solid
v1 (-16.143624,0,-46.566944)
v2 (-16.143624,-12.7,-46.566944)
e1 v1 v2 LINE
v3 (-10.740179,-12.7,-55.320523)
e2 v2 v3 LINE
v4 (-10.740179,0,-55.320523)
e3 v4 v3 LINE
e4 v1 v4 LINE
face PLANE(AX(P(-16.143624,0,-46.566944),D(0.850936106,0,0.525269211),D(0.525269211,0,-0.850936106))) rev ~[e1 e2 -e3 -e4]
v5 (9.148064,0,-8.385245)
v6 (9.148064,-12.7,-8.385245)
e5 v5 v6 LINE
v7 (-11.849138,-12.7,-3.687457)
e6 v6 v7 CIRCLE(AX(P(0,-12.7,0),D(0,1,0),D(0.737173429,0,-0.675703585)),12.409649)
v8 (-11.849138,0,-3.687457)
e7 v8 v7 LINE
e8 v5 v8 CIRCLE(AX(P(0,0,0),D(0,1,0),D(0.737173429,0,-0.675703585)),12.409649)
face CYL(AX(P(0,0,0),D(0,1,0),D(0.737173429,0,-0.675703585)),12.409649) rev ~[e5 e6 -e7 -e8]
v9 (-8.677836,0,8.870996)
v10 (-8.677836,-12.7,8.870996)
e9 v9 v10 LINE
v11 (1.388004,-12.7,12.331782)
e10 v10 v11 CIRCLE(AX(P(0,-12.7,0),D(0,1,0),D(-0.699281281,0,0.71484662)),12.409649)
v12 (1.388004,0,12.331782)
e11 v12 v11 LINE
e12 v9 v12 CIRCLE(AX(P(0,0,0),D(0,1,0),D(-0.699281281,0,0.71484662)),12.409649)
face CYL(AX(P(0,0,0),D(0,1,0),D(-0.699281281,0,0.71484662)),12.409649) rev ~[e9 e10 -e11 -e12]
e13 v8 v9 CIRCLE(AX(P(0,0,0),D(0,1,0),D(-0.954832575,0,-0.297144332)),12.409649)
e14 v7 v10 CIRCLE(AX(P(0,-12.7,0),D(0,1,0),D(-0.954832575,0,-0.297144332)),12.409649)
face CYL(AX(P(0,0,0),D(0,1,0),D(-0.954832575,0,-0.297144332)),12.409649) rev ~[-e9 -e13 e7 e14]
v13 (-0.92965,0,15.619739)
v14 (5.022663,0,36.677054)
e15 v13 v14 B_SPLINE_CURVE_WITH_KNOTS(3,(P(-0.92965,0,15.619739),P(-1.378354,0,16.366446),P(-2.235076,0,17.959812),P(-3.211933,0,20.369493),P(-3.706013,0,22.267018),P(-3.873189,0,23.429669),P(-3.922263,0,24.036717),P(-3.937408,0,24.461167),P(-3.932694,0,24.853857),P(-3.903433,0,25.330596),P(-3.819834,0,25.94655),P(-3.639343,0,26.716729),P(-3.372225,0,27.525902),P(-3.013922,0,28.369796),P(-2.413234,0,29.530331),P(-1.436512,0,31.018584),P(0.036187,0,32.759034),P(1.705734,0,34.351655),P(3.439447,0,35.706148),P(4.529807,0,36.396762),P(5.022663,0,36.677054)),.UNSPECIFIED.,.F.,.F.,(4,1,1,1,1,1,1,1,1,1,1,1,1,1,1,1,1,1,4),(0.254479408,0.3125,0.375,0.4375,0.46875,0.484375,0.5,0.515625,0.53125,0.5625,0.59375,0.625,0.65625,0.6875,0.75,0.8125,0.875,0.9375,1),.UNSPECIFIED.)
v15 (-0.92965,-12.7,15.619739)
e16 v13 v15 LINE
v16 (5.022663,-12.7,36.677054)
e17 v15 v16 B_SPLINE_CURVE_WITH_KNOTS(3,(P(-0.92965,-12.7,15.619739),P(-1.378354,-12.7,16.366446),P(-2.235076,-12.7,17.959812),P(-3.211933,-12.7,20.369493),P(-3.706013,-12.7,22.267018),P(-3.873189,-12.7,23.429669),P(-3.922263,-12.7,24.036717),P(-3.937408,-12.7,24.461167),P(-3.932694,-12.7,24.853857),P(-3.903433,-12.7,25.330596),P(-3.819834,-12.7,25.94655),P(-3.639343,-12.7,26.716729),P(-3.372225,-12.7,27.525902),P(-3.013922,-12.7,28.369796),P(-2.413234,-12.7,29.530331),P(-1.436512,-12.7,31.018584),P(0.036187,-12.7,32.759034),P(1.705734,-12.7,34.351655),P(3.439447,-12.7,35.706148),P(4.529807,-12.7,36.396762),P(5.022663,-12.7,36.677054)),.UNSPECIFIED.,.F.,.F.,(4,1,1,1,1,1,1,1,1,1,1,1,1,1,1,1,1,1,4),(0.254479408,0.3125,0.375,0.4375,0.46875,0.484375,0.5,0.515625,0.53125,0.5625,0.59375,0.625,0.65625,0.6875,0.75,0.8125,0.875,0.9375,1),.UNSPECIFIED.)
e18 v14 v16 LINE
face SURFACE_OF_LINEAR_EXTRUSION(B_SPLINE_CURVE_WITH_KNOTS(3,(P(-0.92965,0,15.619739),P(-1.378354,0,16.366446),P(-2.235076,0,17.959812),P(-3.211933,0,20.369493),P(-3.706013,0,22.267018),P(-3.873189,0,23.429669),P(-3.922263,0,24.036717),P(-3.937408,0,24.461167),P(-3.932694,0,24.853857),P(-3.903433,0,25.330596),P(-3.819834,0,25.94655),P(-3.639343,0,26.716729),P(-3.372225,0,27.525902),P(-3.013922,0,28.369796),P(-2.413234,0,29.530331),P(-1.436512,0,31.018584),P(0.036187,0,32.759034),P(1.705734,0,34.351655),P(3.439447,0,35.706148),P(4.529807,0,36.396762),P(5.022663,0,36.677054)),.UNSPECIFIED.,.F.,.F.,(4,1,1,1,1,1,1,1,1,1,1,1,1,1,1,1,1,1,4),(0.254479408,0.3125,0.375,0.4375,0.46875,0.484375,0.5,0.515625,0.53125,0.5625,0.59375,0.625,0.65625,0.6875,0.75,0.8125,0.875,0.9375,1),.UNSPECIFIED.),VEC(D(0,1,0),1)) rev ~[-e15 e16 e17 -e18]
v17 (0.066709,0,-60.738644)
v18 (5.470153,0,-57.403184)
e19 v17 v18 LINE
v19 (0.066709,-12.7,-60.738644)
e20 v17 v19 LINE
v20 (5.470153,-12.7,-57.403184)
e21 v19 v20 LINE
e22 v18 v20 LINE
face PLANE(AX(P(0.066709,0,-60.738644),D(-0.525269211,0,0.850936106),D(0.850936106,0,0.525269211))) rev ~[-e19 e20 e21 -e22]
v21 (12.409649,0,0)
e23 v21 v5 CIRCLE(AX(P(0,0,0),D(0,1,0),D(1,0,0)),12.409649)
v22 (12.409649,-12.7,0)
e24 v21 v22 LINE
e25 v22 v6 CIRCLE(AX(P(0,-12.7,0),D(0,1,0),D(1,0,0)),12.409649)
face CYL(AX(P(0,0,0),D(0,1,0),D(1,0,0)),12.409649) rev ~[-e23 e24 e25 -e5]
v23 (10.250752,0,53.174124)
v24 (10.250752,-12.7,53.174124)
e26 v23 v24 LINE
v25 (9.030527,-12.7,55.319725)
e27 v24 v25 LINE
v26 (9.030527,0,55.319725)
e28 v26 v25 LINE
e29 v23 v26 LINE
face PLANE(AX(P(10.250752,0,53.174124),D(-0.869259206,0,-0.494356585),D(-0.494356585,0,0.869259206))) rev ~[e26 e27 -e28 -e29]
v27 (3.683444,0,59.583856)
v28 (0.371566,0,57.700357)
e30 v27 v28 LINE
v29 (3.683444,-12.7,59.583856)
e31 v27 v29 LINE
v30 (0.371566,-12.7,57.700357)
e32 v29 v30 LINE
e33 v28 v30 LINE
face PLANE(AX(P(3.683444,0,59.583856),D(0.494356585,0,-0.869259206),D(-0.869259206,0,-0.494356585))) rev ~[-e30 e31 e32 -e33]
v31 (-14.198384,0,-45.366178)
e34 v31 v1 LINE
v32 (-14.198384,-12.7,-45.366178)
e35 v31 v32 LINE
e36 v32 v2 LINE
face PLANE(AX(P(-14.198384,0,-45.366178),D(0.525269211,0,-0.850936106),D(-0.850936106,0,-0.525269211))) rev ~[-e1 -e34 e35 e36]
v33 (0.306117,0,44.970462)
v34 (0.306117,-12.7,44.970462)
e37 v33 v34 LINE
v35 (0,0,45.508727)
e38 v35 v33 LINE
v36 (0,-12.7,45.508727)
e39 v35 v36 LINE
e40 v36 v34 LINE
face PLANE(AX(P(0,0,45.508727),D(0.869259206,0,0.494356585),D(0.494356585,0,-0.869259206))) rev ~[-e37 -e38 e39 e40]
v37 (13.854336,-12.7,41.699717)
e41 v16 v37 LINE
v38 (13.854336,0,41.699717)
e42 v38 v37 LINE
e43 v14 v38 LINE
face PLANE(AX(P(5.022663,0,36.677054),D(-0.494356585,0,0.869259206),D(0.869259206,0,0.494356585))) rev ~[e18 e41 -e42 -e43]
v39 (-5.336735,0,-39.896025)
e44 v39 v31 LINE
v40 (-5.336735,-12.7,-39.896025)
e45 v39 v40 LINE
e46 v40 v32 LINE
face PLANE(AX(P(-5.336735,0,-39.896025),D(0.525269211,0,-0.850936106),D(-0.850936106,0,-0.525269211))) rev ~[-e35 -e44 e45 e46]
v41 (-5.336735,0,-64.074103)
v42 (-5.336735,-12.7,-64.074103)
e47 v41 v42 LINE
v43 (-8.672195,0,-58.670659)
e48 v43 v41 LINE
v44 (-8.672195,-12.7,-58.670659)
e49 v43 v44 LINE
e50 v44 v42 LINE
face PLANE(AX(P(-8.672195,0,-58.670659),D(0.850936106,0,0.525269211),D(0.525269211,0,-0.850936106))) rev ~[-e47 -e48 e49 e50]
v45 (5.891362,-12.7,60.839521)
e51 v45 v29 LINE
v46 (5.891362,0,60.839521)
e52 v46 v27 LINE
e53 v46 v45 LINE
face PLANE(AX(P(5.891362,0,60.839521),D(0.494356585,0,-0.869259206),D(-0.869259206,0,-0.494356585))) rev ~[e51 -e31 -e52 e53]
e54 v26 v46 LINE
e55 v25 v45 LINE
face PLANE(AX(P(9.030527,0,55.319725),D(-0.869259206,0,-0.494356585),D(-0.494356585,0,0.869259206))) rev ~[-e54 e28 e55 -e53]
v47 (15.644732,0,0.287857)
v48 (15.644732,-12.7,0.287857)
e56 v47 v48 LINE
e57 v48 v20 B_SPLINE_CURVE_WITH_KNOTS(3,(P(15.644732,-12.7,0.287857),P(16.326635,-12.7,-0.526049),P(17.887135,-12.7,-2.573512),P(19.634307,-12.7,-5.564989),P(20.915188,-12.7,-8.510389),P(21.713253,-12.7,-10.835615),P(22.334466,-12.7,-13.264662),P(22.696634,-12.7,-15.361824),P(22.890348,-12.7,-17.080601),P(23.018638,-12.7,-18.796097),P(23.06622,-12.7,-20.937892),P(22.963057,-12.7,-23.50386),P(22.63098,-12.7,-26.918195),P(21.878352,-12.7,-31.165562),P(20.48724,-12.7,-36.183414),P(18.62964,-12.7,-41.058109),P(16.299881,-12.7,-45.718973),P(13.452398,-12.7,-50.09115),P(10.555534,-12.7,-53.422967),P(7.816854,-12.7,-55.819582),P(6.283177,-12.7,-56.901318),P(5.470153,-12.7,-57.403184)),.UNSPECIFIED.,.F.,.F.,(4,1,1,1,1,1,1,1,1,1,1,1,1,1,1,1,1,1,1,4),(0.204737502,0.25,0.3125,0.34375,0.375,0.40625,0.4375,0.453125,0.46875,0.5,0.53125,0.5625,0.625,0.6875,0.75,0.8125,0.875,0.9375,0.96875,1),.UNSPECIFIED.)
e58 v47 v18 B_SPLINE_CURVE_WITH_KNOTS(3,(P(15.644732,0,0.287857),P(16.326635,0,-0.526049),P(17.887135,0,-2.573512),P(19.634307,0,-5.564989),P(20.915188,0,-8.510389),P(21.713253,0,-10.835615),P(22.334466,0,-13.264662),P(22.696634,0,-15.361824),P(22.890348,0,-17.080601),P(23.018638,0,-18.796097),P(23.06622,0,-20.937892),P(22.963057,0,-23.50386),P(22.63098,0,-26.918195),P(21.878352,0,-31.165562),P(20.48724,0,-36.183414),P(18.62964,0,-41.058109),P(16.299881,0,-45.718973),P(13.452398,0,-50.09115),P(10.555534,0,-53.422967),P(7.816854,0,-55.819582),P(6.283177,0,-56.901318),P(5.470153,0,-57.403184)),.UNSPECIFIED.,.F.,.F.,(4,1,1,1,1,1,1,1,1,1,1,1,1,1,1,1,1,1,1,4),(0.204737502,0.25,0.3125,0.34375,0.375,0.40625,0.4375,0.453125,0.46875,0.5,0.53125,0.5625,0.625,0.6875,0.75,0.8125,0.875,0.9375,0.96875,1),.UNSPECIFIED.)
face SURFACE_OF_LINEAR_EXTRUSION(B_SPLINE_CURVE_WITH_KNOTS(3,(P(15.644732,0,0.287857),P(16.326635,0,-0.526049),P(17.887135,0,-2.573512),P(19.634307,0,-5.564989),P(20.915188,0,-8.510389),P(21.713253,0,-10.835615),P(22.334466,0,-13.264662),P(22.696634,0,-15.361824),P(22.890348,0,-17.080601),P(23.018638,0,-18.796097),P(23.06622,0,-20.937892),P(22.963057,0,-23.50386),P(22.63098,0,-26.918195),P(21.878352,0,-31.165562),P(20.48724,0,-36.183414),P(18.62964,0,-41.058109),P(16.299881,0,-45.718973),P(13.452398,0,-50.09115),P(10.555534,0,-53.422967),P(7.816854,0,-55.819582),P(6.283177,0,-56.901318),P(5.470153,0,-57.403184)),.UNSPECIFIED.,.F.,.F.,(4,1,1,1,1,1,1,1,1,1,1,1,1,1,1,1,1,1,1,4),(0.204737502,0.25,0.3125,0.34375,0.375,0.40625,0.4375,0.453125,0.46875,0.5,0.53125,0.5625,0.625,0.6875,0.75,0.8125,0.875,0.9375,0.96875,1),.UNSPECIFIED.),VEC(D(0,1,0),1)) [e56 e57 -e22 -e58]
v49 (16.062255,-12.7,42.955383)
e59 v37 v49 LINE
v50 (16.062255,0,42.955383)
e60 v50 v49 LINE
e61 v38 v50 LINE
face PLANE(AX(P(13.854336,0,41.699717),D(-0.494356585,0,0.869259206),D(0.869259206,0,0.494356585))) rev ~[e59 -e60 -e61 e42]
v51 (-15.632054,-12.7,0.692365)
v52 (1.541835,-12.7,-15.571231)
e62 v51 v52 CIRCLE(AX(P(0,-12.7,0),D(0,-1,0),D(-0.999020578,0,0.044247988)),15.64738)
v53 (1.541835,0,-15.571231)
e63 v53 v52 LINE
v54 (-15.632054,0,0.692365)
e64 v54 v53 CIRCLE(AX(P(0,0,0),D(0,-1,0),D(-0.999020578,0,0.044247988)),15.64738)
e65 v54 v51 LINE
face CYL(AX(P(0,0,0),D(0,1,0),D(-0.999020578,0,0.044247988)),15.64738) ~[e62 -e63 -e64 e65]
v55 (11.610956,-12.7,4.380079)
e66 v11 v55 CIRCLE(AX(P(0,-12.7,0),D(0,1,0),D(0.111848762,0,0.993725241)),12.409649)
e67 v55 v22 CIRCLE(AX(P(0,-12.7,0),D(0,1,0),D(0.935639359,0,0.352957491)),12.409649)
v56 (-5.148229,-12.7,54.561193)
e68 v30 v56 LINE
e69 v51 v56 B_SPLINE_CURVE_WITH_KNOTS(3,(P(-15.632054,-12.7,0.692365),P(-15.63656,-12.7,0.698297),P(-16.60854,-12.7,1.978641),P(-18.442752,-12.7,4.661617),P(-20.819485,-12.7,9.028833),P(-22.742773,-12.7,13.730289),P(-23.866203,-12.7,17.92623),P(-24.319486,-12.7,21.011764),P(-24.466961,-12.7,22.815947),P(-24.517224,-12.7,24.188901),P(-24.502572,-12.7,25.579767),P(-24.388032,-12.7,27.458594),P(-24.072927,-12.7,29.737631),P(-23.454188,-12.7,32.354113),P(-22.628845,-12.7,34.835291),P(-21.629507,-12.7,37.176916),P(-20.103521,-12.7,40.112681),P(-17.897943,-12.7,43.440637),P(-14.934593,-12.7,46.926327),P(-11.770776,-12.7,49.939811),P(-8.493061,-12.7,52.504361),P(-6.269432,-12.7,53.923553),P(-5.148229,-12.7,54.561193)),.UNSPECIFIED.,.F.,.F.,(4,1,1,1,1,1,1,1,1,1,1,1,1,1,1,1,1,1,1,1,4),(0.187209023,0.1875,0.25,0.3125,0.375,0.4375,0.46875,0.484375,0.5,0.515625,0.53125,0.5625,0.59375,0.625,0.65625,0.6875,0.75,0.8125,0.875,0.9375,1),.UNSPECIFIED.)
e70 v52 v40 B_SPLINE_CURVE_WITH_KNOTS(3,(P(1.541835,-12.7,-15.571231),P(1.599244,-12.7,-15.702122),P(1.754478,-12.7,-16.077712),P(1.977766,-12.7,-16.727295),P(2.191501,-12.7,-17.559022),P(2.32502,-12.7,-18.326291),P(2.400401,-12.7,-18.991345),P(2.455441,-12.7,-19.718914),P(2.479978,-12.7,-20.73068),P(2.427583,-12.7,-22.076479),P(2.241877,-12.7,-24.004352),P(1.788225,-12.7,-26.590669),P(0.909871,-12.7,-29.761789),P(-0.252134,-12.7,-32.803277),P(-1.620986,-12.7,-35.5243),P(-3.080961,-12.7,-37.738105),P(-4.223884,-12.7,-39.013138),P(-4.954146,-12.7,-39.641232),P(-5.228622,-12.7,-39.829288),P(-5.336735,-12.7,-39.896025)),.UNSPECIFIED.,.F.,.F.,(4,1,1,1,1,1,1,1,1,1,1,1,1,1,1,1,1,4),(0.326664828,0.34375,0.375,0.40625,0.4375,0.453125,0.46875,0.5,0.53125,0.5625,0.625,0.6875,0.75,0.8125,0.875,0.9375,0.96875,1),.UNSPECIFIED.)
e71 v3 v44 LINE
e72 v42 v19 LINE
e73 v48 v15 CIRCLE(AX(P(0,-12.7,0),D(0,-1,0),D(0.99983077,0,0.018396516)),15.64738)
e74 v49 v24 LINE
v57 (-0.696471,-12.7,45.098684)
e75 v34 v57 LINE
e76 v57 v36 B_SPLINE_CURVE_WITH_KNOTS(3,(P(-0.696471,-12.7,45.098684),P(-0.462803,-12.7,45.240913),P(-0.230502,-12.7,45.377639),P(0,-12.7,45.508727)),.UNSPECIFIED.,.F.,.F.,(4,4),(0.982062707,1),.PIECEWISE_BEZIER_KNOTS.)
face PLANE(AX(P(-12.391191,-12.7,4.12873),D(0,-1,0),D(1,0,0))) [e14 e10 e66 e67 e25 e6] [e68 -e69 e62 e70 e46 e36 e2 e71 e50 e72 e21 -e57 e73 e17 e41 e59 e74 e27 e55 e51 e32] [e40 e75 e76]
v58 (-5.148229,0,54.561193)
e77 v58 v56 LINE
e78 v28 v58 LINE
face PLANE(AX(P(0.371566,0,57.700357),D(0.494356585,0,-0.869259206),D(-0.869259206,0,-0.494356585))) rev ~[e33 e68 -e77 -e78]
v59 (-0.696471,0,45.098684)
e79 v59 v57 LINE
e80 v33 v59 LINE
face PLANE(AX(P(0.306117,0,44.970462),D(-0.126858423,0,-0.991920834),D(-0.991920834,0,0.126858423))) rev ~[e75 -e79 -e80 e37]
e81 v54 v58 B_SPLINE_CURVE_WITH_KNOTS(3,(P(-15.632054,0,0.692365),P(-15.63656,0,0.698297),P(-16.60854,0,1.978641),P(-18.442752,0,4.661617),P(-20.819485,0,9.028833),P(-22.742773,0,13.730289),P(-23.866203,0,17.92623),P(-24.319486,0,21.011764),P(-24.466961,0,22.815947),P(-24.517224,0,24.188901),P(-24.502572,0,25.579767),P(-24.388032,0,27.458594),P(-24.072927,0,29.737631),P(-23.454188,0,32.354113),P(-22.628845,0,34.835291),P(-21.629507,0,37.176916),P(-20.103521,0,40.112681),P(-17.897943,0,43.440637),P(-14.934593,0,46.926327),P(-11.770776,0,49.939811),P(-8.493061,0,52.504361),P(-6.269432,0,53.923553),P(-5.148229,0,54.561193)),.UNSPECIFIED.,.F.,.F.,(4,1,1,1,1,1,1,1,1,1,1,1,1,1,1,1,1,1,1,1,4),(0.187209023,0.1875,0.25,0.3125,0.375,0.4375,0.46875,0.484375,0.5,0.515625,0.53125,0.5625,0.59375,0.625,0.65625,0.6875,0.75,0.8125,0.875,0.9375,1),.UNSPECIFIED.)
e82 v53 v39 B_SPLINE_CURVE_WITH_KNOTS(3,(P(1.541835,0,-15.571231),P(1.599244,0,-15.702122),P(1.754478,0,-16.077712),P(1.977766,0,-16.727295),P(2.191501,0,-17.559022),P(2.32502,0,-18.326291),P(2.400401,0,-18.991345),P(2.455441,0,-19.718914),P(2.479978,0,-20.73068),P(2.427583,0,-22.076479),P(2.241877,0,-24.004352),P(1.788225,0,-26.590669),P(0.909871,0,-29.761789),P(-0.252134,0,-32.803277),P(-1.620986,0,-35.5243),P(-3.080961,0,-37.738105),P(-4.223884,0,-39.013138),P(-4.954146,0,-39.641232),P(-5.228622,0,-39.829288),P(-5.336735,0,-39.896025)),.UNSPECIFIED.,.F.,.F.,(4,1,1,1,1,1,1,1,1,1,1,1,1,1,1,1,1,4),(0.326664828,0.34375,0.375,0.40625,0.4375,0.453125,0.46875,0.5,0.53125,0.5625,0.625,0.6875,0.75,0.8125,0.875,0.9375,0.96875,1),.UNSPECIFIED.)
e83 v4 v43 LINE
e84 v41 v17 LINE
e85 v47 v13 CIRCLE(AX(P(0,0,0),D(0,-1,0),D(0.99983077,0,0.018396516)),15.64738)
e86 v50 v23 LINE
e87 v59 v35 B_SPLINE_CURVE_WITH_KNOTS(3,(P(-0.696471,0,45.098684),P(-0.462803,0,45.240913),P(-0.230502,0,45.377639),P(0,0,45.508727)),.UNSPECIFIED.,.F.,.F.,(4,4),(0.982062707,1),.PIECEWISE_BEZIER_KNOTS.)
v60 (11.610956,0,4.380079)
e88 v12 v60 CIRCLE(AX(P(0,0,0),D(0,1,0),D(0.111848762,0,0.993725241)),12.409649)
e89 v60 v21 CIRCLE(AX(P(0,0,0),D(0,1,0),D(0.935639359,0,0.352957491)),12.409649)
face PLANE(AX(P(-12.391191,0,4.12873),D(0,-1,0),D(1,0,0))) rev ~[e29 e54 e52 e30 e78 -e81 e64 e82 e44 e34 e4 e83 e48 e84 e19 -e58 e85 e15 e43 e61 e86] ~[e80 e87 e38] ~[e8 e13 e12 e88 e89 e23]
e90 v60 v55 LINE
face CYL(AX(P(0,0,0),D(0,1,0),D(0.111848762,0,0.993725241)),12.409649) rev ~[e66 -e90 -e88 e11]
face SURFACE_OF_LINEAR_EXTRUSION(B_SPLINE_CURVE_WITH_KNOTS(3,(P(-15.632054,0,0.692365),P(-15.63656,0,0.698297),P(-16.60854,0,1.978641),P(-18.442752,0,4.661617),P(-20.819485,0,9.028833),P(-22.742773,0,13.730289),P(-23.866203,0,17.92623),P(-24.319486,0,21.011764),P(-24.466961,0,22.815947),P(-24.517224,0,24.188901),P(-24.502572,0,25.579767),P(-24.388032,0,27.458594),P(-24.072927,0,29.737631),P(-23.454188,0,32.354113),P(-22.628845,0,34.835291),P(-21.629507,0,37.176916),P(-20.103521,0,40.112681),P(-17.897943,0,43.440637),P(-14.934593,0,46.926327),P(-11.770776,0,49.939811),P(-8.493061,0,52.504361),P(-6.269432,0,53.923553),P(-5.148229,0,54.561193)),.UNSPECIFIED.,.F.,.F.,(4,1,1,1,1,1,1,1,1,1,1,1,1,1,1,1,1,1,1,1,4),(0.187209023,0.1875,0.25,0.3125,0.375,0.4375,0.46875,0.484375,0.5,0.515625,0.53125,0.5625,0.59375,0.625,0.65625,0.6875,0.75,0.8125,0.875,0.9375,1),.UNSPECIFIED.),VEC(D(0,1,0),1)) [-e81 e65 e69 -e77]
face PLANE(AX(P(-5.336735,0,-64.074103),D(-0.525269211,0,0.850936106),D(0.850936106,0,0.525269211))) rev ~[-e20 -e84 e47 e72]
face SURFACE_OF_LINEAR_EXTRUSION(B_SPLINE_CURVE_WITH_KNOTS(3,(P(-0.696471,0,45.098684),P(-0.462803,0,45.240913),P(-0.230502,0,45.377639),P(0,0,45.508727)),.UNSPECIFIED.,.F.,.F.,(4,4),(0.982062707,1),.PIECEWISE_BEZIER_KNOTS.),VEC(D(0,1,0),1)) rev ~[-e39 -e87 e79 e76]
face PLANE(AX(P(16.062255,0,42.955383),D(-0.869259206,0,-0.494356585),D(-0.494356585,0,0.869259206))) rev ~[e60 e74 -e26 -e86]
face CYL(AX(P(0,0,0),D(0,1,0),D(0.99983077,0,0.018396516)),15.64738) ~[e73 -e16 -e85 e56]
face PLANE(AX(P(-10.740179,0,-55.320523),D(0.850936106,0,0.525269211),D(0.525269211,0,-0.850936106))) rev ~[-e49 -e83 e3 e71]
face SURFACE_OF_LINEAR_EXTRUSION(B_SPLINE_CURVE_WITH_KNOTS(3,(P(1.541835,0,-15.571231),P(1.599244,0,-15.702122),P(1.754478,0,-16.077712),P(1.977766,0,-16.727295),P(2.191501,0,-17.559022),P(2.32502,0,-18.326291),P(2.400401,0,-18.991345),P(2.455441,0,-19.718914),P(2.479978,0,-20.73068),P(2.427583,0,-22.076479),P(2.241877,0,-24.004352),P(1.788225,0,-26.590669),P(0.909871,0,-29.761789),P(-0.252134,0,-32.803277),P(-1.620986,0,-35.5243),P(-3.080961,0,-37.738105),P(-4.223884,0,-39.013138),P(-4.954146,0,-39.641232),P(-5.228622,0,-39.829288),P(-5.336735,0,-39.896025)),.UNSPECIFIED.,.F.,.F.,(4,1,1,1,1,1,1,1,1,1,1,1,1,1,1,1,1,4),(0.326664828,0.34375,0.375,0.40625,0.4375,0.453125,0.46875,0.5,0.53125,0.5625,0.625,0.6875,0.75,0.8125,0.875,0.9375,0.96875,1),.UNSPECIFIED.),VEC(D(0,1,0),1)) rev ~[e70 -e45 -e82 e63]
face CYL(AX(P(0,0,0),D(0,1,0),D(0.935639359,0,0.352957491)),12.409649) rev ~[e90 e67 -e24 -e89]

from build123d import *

# Parameters (mm, degrees)
F1_DEPTH = 12.7


# Not quite as in the source:
# - the dataset's text gives a spline's control points without its knots; the knots are read off the source's solid


with BuildPart() as f1:
    # F0 (on Front) → F1 (new body)
    with BuildSketch(Plane.XZ):
        with BuildLine():
            ThreePointArc((-11.8491375073, -3.6874569895), (-12.0319508259, 3.038347913), (-8.6778355467, 8.8709959385))
            add(Edge.make_bspline(
                [(-8.6778355467, 8.8709959385), (-9.2853744088, 9.7814260815), (-9.8597528454, 10.7272806041), (-10.3912226552, 11.6988451747)],
                knots=[0.2252802502, 0.2252802502, 0.2252802502, 0.2252802502, 0.2789767598, 0.2789767598, 0.2789767598, 0.2789767598], degree=3))
            ThreePointArc((-10.3912226552, 11.6988451747), (-14.1275753459, 6.7269682278), (-15.6320541614, 0.6923650678))
            add(Edge.make_bspline(
                [(-11.8491375073, -3.6874569895), (-12.0986304351, -3.4342357303), (-13.4209716173, -2.0574119677), (-14.6688396939, -0.5758176521), (-15.6320541614, 0.6923650678)],
                knots=[0.1107256969, 0.1107256969, 0.1107256969, 0.1107256969, 0.125, 0.187209023, 0.187209023, 0.187209023, 0.187209023], degree=3))
        make_face()
        with BuildLine():
            add(Edge.make_bspline(
                [(-8.6778355467, 8.8709959385), (-9.2853744088, 9.7814260815), (-9.8597528454, 10.7272806041), (-10.3912226552, 11.6988451747)],
                knots=[0.2252802502, 0.2252802502, 0.2252802502, 0.2252802502, 0.2789767598, 0.2789767598, 0.2789767598, 0.2789767598], degree=3))
            ThreePointArc((-8.6778355467, 8.8709959385), (-4.0348074378, 11.7354048782), (1.3880039263, 12.331781859))
            add(Edge.make_bspline(
                [(1.3880039263, 12.331781859), (1.1715122405, 12.5949393869), (0.3992065245, 13.5716380523), (-0.3737885205, 14.7019009055), (-0.8950079656, 15.5620901399), (-0.929649614, 15.6197387394)],
                knots=[0.1633568702, 0.1633568702, 0.1633568702, 0.1633568702, 0.1875, 0.25, 0.2544794081, 0.2544794081, 0.2544794081, 0.2544794081], degree=3))
            ThreePointArc((-0.929649614, 15.6197387394), (-5.9903162538, 14.4553311228), (-10.3912226552, 11.6988451747))
        make_face()
        with BuildLine():
            ThreePointArc((12.4096494196, 0), (11.5655450275, -4.4986183361), (9.1480638179, -8.3852446058))
            add(Edge.make_bspline(
                [(9.1480638179, -8.3852446058), (9.7633588854, -9.3122728001), (10.3114373795, -10.2956591108), (10.7802117804, -11.3414073492)],
                knots=[0.2554886882, 0.2554886882, 0.2554886882, 0.2554886882, 0.3234426707, 0.3234426707, 0.3234426707, 0.3234426707], degree=3))
            ThreePointArc((10.7802117804, -11.3414073492), (14.3791959444, -6.1708354931), (15.6473795471, 0))
            ThreePointArc((15.6473795471, 0), (15.6467175307, 0.1439347261), (15.6447315375, 0.2878572728))
            add(Edge.make_bspline(
                [(11.6109564261, 4.3800787194), (11.6883935226, 4.3126793989), (12.801065895, 3.3367304215), (14.1660004984, 2.000745319), (15.3850396401, 0.5978206791), (15.6447315375, 0.2878572728)],
                knots=[0.1203328038, 0.1203328038, 0.1203328038, 0.1203328038, 0.125, 0.1875, 0.2047375018, 0.2047375018, 0.2047375018, 0.2047375018], degree=3))
            ThreePointArc((11.6109564261, 4.3800787194), (12.208343405, 2.2261513923), (12.4096494196, 0))
        make_face()
        with BuildLine():
            add(Edge.make_bspline(
                [(9.1480638179, -8.3852446058), (9.7633588854, -9.3122728001), (10.3114373795, -10.2956591108), (10.7802117804, -11.3414073492)],
                knots=[0.2554886882, 0.2554886882, 0.2554886882, 0.2554886882, 0.3234426707, 0.3234426707, 0.3234426707, 0.3234426707], degree=3))
            ThreePointArc((9.1480638179, -8.3852446058), (4.7241366094, -11.4752748121), (-0.5930675386, -12.3954697213))
            add(Edge.make_bspline(
                [(-0.5930675386, -12.3954697213), (-0.5422251349, -12.4502827191), (-0.0893674975, -12.9460413617), (0.6470698049, -13.8821382909), (1.2271907242, -14.8823314511), (1.4942386676, -15.4627127324), (1.5418348503, -15.5712309078)],
                knots=[0.1797309234, 0.1797309234, 0.1797309234, 0.1797309234, 0.1875, 0.25, 0.3125, 0.326664828, 0.326664828, 0.326664828, 0.326664828], degree=3))
            ThreePointArc((1.5418348503, -15.5712309078), (6.5139128123, -14.2270666887), (10.7802117804, -11.3414073492))
        make_face()
        with BuildLine():
            ThreePointArc((-15.6320541614, 0.6923650678), (-14.1275753459, 6.7269682278), (-10.3912226552, 11.6988451747))
            add(Edge.make_bspline(
                [(-10.3912226552, 11.6988451747), (-12.8029404637, 16.1076366694), (-17.2123471815, 30.3566232389), (-6.6813074108, 41.4558396662), (-0.6964705023, 45.0986841551)],
                knots=[0.2789767598, 0.2789767598, 0.2789767598, 0.2789767598, 0.5226422061, 0.9820627069, 0.9820627069, 0.9820627069, 0.9820627069], degree=3))
            add(Edge.make_bspline(
                [(-0.6964705023, 45.0986841551), (-0.4628027101, 45.240912831), (-0.2305015334, 45.377638856), (0, 45.5087274313)],
                knots=[0.9820627069, 0.9820627069, 0.9820627069, 0.9820627069, 1, 1, 1, 1], degree=3))
            Line((0, 45.5087274313), (-5.1482294751, 54.5611928011))
            add(Edge.make_bspline(
                [(-15.6320541614, 0.6923650678), (-15.636559509, 0.6982968766), (-16.6085403024, 1.978641132), (-18.442751654, 4.6616170097), (-20.8194846225, 9.0288333995), (-22.7427732281, 13.7302890055), (-23.866202795, 17.9262301222), (-24.3194859098, 21.0117640249), (-24.4669610536, 22.8159468829), (-24.5172239147, 24.1889005784), (-24.502571598, 25.579766526), (-24.388031674, 27.4585942739), (-24.0729268068, 29.7376311161), (-23.4541878049, 32.3541134778), (-22.6288454178, 34.8352906061), (-21.6295067826, 37.1769157355), (-20.1035209307, 40.1126812586), (-17.8979428955, 43.4406369139), (-14.9345931184, 46.9263269169), (-11.7707761701, 49.9398108312), (-8.4930608318, 52.5043610495), (-6.269432358, 53.9235532749), (-5.1482294751, 54.5611928011)],
                knots=[0.187209023, 0.187209023, 0.187209023, 0.187209023, 0.1875, 0.25, 0.3125, 0.375, 0.4375, 0.46875, 0.484375, 0.5, 0.515625, 0.53125, 0.5625, 0.59375, 0.625, 0.65625, 0.6875, 0.75, 0.8125, 0.875, 0.9375, 1, 1, 1, 1], degree=3))
        make_face()
        with BuildLine():
            add(Edge.make_bspline(
                [(-10.3912226552, 11.6988451747), (-12.8029404637, 16.1076366694), (-17.2123471815, 30.3566232389), (-6.6813074108, 41.4558396662), (-0.6964705023, 45.0986841551)],
                knots=[0.2789767598, 0.2789767598, 0.2789767598, 0.2789767598, 0.5226422061, 0.9820627069, 0.9820627069, 0.9820627069, 0.9820627069], degree=3))
            ThreePointArc((-10.3912226552, 11.6988451747), (-5.9903162538, 14.4553311228), (-0.929649614, 15.6197387394))
            add(Edge.make_bspline(
                [(-0.929649614, 15.6197387394), (-1.378353745, 16.3664458385), (-2.2350758783, 17.9598118494), (-3.2119329355, 20.3694931918), (-3.7060132508, 22.267017983), (-3.8731893948, 23.4296691454), (-3.9222634293, 24.0367170821), (-3.9374083126, 24.4611674633), (-3.9326943692, 24.8538568084), (-3.9034333763, 25.3305962326), (-3.8198337247, 25.9465502567), (-3.6393425731, 26.7167285079), (-3.3722246374, 27.525901957), (-3.0139222068, 28.3697964463), (-2.4132338328, 29.5303307169), (-1.436511786, 31.0185840281), (0.0361873799, 32.7590338295), (1.7057339174, 34.3516547718), (3.4394466992, 35.7061480035), (4.5298073789, 36.3967620304), (5.0226628601, 36.6770539743)],
                knots=[0.2544794081, 0.2544794081, 0.2544794081, 0.2544794081, 0.3125, 0.375, 0.4375, 0.46875, 0.484375, 0.5, 0.515625, 0.53125, 0.5625, 0.59375, 0.625, 0.65625, 0.6875, 0.75, 0.8125, 0.875, 0.9375, 1, 1, 1, 1], degree=3))
            Line((5.0226628601, 36.6770539743), (0.3061173234, 44.9704615124))
            Line((0.3061173234, 44.9704615124), (-0.6964705023, 45.0986841551))
        make_face()
        with BuildLine():
            add(Edge.make_bspline(
                [(1.3880039263, 12.331781859), (1.1715122405, 12.5949393869), (0.3992065245, 13.5716380523), (-0.3737885205, 14.7019009055), (-0.8950079656, 15.5620901399), (-0.929649614, 15.6197387394)],
                knots=[0.1633568702, 0.1633568702, 0.1633568702, 0.1633568702, 0.1875, 0.25, 0.2544794081, 0.2544794081, 0.2544794081, 0.2544794081], degree=3))
            ThreePointArc((1.3880039263, 12.331781859), (7.6190969455, 9.7953438148), (11.6109564261, 4.3800787194))
            add(Edge.make_bspline(
                [(11.6109564261, 4.3800787194), (11.6883935226, 4.3126793989), (12.801065895, 3.3367304215), (14.1660004984, 2.000745319), (15.3850396401, 0.5978206791), (15.6447315375, 0.2878572728)],
                knots=[0.1203328038, 0.1203328038, 0.1203328038, 0.1203328038, 0.125, 0.1875, 0.2047375018, 0.2047375018, 0.2047375018, 0.2047375018], degree=3))
            ThreePointArc((15.6447315375, 0.2878572728), (10.625443818, 11.4865325647), (-0.929649614, 15.6197387394))
        make_face()
        with BuildLine():
            ThreePointArc((-0.5930675386, -12.3954697213), (-7.5933844915, -9.8152896381), (-11.8491375073, -3.6874569895))
            add(Edge.make_bspline(
                [(-11.8491375073, -3.6874569895), (-12.0986304351, -3.4342357303), (-13.4209716173, -2.0574119677), (-14.6688396939, -0.5758176521), (-15.6320541614, 0.6923650678)],
                knots=[0.1107256969, 0.1107256969, 0.1107256969, 0.1107256969, 0.125, 0.187209023, 0.187209023, 0.187209023, 0.187209023], degree=3))
            ThreePointArc((-15.6320541614, 0.6923650678), (-10.7591685819, -11.3613721934), (1.5418348503, -15.5712309078))
            add(Edge.make_bspline(
                [(-0.5930675386, -12.3954697213), (-0.5422251349, -12.4502827191), (-0.0893674975, -12.9460413617), (0.6470698049, -13.8821382909), (1.2271907242, -14.8823314511), (1.4942386676, -15.4627127324), (1.5418348503, -15.5712309078)],
                knots=[0.1797309234, 0.1797309234, 0.1797309234, 0.1797309234, 0.1875, 0.25, 0.3125, 0.326664828, 0.326664828, 0.326664828, 0.326664828], degree=3))
        make_face()
        with BuildLine():
            ThreePointArc((15.6473795471, 0), (14.3791959444, -6.1708354931), (10.7802117804, -11.3414073492))
            add(Edge.make_bspline(
                [(10.7802117804, -11.3414073492), (11.6264835061, -13.229281697), (14.8682711517, -24.7617360554), (8.08607989, -43.5501283525), (0, -48.5415357893)],
                knots=[0.3234426707, 0.3234426707, 0.3234426707, 0.3234426707, 0.446119024, 1, 1, 1, 1], degree=3))
            Line((0, -48.5415357893), (5.4701533549, -57.4031840516))
            add(Edge.make_bspline(
                [(15.6447315375, 0.2878572728), (16.3266345282, -0.5260494212), (17.8871346304, -2.5735124946), (19.6343071308, -5.5649885279), (20.9151883898, -8.5103892259), (21.7132531018, -10.8356150551), (22.3344664493, -13.2646623418), (22.6966343535, -15.3618244109), (22.8903478004, -17.0806012193), (23.0186382679, -18.796096541), (23.0662198627, -20.9378919201), (22.9630569039, -23.5038601417), (22.6309798906, -26.9181954555), (21.878352145, -31.1655622837), (20.48723974, -36.1834140821), (18.6296401775, -41.0581085457), (16.2998809407, -45.718972551), (13.452397619, -50.0911504281), (10.5555341156, -53.4229665407), (7.8168542439, -55.8195818603), (6.2831768326, -56.9013176976), (5.4701533549, -57.4031840516)],
                knots=[0.2047375018, 0.2047375018, 0.2047375018, 0.2047375018, 0.25, 0.3125, 0.34375, 0.375, 0.40625, 0.4375, 0.453125, 0.46875, 0.5, 0.53125, 0.5625, 0.625, 0.6875, 0.75, 0.8125, 0.875, 0.9375, 0.96875, 1, 1, 1, 1], degree=3))
            ThreePointArc((15.6447315375, 0.2878572728), (15.6467175307, 0.1439347261), (15.6473795471, 0))
        make_face()
        with BuildLine():
            add(Edge.make_bspline(
                [(10.7802117804, -11.3414073492), (11.6264835061, -13.229281697), (14.8682711517, -24.7617360554), (8.08607989, -43.5501283525), (0, -48.5415357893)],
                knots=[0.3234426707, 0.3234426707, 0.3234426707, 0.3234426707, 0.446119024, 1, 1, 1, 1], degree=3))
            ThreePointArc((10.7802117804, -11.3414073492), (6.5139128123, -14.2270666887), (1.5418348503, -15.5712309078))
            add(Edge.make_bspline(
                [(1.5418348503, -15.5712309078), (1.5992438757, -15.7021221335), (1.7544783645, -16.0777122744), (1.9777658515, -16.7272947355), (2.1915014853, -17.5590215657), (2.3250200741, -18.3262912642), (2.4004010179, -18.9913445586), (2.4554405815, -19.718914297), (2.4799779419, -20.7306801507), (2.4275831434, -22.0764789614), (2.2418770735, -24.0043519572), (1.7882246185, -26.5906690812), (0.9098712215, -29.7617893454), (-0.2521338933, -32.8032773219), (-1.6209855373, -35.5242995778), (-3.0809606838, -37.7381050829), (-4.2238837122, -39.0131375196), (-4.9541458564, -39.6412317653), (-5.2286217969, -39.8292882956), (-5.3367351858, -39.8960249567)],
                knots=[0.326664828, 0.326664828, 0.326664828, 0.326664828, 0.34375, 0.375, 0.40625, 0.4375, 0.453125, 0.46875, 0.5, 0.53125, 0.5625, 0.625, 0.6875, 0.75, 0.8125, 0.875, 0.9375, 0.96875, 1, 1, 1, 1], degree=3))
            Line((-5.3367351858, -39.8960249567), (0, -48.5415357893))
        make_face()
        Polygon((-13.237771211, -46.922370502), (0, -48.5415357893), (-5.3367351858, -39.8960249567), (-14.1983836254, -45.366178421), align=None)
        Polygon((5.4701533549, -57.4031840516), (0, -48.5415357893), (-13.237771211, -46.922370502), (-7.8223193044, -55.6954024197), align=None)
        Polygon((-5.1482294751, 54.5611928011), (0, 45.5087274313), (0.3061173234, 44.9704615124), (12.9110272843, 43.3583983844), (7.1709556817, 53.4515381045), align=None)
        Polygon((12.9110272843, 43.3583983844), (0.3061173234, 44.9704615124), (5.0226628601, 36.6770539743), (13.8543363917, 41.6997168768), align=None)
        Polygon((0.3715664821, 57.7003571152), (-5.1482294751, 54.5611928011), (7.1709556817, 53.4515381045), (3.6834440565, 59.5838557036), align=None)
        Polygon((0.0667090845, -60.7386435427), (5.4701533549, -57.4031840516), (-7.8223193044, -55.6954024197), (-3.3914950846, -62.8733375159), align=None)
        Polygon((-7.8223193044, -55.6954024197), (-13.237771211, -46.922370502), (-16.1436237266, -46.566943939), (-10.7401794562, -55.3205234864), align=None)
        Polygon((-16.1436237266, -46.566943939), (-13.237771211, -46.922370502), (-14.1983836254, -45.366178421), align=None)
        Polygon((7.1709556817, 53.4515381045), (12.9110272843, 43.3583983844), (16.0622547746, 42.9553826024), (10.2507519709, 53.1741244303), align=None)
        Polygon((16.0622547746, 42.9553826024), (12.9110272843, 43.3583983844), (13.8543363917, 41.6997168768), align=None)
        Polygon((3.6834440565, 59.5838557036), (7.1709556817, 53.4515381045), (10.2507519709, 53.1741244303), (9.0305267534, 55.319725472), (5.8913624394, 60.8395214293), align=None)
        Polygon((-3.3914950846, -62.8733375159), (-7.8223193044, -55.6954024197), (-10.7401794562, -55.3205234864), (-8.672194677, -58.6706587635), (-5.3367351858, -64.0741030339), align=None)
    extrude(amount=F1_DEPTH)


solid = f1.part
